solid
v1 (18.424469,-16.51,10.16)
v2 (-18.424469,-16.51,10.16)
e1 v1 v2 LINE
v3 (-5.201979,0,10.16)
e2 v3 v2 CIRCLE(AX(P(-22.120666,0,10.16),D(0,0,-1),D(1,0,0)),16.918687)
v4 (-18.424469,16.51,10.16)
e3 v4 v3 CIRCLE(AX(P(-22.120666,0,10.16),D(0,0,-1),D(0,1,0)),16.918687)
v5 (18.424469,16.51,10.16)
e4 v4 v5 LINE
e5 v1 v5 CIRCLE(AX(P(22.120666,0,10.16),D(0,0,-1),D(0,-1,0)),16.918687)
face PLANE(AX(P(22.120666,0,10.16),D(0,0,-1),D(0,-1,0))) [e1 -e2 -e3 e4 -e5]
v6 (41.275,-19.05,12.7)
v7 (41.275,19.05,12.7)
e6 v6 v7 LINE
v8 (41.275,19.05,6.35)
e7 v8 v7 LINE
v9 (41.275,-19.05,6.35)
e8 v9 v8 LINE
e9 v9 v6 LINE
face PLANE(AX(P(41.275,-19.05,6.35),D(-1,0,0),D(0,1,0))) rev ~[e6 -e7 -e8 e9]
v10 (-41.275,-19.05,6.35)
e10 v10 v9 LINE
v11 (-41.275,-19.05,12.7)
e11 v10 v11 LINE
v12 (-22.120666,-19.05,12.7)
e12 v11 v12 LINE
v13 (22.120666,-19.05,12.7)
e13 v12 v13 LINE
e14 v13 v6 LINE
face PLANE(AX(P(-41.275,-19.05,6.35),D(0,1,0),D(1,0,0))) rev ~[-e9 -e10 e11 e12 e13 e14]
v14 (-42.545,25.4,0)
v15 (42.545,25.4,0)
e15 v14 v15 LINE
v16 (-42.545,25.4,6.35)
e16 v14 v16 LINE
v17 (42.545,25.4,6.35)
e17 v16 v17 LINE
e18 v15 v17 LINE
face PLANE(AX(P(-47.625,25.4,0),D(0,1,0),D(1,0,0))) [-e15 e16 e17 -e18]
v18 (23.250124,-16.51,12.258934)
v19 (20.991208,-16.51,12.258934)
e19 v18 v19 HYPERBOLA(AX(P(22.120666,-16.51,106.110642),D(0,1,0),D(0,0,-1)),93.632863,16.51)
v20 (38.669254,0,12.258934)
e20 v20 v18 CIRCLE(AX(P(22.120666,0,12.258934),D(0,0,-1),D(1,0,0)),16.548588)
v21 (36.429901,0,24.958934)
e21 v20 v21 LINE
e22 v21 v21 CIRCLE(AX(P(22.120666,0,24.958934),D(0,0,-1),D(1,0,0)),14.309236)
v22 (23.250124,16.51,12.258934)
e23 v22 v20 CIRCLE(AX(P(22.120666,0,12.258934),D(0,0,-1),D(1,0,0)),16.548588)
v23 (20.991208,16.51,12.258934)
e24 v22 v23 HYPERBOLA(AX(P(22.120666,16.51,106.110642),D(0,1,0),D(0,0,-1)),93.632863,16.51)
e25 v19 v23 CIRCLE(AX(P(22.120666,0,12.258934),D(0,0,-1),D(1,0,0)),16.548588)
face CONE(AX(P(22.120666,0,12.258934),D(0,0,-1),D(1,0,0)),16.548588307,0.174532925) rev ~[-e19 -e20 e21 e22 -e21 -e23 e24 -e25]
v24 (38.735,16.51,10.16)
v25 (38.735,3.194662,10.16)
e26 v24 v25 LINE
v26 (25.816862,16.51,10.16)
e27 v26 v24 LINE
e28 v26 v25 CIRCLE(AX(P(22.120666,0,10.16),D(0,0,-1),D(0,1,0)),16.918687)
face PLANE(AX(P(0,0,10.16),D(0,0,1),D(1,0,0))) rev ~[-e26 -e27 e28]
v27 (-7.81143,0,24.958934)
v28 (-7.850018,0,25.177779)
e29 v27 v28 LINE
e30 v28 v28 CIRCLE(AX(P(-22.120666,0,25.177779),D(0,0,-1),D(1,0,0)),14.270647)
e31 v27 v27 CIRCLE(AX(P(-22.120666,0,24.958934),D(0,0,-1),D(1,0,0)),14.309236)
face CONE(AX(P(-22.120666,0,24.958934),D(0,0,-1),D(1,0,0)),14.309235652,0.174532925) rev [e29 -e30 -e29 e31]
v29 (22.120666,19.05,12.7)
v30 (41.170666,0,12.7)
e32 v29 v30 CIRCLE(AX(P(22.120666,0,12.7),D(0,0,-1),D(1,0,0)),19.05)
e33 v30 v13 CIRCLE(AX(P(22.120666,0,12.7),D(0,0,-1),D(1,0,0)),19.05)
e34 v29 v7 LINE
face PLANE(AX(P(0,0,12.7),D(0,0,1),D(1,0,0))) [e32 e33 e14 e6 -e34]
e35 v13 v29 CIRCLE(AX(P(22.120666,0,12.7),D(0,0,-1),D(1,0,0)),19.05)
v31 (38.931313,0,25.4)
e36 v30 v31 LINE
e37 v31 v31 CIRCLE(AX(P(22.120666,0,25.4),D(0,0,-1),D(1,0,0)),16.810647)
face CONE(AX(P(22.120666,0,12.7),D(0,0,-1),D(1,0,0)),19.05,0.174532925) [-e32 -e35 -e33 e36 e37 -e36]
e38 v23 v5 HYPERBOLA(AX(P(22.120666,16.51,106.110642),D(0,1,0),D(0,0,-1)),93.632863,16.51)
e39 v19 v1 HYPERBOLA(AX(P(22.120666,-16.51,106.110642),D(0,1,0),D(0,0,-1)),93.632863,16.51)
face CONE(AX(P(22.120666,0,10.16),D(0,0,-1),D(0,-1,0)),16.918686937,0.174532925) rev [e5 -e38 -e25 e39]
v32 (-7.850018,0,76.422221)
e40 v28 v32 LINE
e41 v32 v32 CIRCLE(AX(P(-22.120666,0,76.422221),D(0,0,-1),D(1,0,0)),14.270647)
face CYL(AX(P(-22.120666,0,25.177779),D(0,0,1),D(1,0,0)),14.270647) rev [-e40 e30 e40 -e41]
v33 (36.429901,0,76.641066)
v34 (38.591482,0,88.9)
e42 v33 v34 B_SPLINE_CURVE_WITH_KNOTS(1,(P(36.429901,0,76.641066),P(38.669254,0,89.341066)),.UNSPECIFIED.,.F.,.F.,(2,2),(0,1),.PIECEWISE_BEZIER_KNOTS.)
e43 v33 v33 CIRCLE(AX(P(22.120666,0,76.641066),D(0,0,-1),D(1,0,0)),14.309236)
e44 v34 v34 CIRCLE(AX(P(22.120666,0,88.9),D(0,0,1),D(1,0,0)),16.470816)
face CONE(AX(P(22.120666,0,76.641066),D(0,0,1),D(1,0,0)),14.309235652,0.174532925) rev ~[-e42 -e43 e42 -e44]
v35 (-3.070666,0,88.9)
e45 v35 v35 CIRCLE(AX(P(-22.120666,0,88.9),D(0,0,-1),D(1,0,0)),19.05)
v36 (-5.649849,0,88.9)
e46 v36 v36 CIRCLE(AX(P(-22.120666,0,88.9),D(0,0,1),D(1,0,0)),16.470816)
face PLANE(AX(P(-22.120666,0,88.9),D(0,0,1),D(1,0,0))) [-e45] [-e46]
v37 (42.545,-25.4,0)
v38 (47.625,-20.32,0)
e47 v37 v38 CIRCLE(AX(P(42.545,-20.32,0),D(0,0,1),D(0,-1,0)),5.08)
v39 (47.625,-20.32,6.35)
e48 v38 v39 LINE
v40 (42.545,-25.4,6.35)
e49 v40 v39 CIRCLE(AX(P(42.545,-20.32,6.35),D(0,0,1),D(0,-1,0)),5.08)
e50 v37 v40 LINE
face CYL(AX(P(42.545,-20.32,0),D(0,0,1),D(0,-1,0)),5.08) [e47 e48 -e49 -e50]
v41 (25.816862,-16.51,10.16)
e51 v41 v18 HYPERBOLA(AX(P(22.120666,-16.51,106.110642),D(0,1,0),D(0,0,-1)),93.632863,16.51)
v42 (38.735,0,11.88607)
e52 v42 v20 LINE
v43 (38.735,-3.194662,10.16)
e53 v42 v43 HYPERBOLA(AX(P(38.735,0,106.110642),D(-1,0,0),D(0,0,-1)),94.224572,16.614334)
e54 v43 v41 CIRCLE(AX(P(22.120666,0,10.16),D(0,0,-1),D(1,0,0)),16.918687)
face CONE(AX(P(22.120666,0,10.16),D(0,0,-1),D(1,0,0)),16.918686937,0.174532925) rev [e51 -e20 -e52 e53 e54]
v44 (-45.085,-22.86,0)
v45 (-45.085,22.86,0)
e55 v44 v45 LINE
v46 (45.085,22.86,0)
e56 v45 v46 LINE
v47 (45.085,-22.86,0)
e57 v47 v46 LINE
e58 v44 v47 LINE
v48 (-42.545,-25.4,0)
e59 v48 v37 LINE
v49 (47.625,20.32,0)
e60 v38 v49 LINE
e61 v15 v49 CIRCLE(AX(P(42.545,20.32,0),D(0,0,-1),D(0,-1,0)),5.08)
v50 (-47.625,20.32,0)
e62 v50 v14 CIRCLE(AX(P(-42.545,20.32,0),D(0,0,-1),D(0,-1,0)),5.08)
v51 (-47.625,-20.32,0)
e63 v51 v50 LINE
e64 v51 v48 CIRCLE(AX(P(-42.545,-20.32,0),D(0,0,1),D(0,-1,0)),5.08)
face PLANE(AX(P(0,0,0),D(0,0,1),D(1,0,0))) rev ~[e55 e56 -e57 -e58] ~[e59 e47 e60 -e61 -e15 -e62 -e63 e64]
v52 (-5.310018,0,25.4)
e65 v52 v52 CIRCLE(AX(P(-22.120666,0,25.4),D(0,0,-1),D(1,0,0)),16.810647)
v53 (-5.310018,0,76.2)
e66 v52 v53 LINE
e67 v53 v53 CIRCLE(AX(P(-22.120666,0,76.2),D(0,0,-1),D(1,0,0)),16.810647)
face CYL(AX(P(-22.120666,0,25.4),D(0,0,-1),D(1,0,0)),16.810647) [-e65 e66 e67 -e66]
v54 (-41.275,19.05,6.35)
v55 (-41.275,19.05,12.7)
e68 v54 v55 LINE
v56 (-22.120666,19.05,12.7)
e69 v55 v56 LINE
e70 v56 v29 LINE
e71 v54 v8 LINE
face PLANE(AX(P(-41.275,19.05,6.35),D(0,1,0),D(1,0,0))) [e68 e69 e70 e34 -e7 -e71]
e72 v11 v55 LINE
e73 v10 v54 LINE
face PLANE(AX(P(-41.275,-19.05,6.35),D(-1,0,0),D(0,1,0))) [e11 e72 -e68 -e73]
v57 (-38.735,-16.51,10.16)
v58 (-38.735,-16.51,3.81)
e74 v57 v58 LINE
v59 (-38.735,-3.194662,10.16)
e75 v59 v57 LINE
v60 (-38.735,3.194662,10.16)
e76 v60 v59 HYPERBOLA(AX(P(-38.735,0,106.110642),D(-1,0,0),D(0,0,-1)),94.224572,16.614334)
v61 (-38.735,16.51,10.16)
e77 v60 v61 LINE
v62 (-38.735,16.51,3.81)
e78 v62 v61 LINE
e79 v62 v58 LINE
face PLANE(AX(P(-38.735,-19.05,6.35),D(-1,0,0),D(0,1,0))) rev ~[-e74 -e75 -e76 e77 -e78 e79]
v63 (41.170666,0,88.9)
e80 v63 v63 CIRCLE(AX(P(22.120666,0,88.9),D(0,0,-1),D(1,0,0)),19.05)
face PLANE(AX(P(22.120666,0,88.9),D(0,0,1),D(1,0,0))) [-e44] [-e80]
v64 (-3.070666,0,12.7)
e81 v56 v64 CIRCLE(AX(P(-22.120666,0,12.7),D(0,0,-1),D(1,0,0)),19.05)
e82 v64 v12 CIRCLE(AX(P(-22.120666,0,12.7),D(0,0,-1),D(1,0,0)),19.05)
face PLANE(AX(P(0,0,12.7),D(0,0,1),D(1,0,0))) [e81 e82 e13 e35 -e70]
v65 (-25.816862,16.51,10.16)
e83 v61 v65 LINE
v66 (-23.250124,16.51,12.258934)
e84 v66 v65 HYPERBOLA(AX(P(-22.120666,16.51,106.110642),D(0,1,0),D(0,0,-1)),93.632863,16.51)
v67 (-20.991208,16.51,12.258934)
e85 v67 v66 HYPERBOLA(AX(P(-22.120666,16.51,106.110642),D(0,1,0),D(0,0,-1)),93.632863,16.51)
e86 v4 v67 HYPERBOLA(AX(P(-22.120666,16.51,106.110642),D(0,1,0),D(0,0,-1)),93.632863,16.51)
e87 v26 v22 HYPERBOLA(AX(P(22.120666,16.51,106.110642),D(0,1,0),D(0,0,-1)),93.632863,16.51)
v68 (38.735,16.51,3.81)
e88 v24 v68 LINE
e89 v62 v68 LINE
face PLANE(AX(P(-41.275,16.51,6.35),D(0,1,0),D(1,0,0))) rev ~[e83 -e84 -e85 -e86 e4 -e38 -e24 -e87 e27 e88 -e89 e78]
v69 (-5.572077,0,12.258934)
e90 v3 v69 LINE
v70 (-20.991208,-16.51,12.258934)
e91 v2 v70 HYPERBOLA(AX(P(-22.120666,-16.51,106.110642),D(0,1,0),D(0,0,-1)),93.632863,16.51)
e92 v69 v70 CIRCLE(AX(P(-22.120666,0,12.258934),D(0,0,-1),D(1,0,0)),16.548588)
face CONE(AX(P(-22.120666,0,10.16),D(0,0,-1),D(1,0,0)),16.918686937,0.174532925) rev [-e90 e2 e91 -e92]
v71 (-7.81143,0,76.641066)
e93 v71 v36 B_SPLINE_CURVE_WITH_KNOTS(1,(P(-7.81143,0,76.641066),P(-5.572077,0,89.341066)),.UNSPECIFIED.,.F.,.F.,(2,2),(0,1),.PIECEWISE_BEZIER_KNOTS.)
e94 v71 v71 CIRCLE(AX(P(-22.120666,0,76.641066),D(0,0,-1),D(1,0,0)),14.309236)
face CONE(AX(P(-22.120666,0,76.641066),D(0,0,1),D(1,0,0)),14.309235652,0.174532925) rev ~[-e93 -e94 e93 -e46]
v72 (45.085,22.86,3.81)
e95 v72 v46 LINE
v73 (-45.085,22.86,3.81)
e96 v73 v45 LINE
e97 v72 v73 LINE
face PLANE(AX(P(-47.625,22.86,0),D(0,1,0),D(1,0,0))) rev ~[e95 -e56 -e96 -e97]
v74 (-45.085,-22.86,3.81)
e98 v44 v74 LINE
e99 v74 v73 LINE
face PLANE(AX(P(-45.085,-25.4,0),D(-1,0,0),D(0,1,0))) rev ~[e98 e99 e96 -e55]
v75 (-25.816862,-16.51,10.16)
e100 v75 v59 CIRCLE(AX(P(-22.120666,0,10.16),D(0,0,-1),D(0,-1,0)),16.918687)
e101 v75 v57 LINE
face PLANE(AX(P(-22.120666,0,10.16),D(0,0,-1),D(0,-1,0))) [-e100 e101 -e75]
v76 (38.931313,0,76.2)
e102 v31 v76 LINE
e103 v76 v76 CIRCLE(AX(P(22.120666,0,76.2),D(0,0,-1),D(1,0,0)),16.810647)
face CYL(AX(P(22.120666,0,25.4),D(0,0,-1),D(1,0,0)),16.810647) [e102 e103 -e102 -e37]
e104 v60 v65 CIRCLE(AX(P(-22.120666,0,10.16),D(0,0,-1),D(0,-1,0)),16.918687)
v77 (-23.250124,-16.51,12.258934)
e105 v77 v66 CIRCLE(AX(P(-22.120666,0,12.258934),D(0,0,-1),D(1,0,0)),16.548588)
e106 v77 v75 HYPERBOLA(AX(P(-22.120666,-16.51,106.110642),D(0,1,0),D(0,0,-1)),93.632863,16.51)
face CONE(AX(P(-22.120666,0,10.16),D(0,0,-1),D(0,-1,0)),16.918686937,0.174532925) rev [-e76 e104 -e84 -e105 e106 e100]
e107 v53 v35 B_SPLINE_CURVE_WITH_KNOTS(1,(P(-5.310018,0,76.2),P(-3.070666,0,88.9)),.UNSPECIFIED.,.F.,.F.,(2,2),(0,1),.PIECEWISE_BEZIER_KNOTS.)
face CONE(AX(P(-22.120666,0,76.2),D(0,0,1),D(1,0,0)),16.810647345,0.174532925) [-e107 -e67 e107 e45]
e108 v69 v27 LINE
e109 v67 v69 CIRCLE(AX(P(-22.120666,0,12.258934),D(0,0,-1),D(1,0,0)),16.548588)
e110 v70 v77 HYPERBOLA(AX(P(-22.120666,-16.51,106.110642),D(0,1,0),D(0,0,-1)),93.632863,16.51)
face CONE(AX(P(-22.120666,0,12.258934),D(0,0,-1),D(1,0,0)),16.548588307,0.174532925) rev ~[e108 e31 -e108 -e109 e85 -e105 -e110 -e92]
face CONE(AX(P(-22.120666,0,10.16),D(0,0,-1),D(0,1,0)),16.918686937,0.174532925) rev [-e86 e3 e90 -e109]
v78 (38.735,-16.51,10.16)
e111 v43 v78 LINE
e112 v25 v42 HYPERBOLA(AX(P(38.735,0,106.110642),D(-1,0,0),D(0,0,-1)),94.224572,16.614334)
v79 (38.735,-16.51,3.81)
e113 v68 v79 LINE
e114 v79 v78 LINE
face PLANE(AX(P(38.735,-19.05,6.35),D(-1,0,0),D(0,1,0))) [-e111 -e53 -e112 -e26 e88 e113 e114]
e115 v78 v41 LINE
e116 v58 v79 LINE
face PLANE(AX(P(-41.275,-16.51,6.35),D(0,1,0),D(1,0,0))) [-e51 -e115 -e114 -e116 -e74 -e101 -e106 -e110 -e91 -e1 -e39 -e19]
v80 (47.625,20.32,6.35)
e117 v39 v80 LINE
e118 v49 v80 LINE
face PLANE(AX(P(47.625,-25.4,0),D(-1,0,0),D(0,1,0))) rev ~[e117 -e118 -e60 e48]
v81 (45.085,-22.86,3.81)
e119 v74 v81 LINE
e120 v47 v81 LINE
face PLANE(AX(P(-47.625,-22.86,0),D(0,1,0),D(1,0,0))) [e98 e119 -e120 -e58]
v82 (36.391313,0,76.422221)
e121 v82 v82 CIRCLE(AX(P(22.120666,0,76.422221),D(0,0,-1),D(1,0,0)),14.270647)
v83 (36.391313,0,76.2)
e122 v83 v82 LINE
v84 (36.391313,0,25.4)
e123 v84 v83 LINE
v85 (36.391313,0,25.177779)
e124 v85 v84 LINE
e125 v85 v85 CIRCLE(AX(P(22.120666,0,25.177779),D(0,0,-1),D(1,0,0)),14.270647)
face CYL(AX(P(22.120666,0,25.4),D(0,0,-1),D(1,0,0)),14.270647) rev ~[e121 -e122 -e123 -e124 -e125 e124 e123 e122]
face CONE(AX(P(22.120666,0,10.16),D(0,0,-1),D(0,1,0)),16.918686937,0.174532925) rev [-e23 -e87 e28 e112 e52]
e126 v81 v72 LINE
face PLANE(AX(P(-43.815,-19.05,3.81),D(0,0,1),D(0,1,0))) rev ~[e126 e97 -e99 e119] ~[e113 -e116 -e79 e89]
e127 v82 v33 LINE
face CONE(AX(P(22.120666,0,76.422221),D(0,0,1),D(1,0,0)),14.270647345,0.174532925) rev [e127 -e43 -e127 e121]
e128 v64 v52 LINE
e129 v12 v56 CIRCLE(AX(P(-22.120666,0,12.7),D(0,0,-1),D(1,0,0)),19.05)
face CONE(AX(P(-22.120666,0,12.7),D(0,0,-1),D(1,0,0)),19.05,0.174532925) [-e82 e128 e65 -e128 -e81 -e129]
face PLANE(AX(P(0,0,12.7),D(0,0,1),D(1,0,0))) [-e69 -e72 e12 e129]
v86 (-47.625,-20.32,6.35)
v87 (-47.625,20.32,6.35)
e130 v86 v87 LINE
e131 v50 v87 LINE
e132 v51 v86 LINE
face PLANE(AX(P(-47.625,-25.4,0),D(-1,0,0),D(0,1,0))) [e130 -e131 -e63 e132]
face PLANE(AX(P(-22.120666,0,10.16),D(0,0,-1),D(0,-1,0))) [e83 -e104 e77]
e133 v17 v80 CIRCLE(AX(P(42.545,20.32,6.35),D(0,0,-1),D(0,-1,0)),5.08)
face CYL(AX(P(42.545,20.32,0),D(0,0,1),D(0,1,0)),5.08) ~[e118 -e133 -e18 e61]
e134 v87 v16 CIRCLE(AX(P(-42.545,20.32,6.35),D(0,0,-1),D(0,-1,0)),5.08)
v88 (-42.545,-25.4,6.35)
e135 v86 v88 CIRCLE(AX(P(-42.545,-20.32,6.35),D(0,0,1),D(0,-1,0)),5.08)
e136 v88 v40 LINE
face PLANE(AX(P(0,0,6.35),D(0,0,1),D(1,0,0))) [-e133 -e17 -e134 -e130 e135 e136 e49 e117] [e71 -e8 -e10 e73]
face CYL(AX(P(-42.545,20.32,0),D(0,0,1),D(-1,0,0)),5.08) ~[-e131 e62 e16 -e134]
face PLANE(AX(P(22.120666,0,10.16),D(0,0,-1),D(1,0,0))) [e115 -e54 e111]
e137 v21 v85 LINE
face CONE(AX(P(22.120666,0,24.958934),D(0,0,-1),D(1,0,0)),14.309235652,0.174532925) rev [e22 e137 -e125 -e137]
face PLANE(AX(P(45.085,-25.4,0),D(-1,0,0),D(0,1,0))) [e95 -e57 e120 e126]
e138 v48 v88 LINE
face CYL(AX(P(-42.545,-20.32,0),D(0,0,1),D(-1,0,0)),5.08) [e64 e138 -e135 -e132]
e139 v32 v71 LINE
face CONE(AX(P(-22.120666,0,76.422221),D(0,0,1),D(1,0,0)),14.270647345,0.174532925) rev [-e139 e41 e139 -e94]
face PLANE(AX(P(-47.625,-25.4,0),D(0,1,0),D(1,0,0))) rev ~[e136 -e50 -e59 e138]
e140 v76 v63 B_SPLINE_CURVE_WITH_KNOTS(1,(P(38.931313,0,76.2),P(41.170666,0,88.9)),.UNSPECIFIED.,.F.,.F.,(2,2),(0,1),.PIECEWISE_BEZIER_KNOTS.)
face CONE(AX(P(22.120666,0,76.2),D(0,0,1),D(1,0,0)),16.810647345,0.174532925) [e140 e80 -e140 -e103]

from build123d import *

# Parameters (mm, degrees)
F0_W         = 95.25
F0_H         = 50.8
F1_DEPTH     = 6.35
F2_W         = 82.55
F2_H         = 38.1
F3_DEPTH     = 6.35
F4_R         = 19.05
F5_DEPTH     = 12.7
F5_TAPER     = 10
F6_DEPTH     = 50.8
F6_FACE_R    = 16.810647345
F7_DEPTH     = 12.7
F7_TAPER     = -10
F8_T         = 2.54
F8_T3_DEPTH  = 87.63
F8_T5_DEPTH  = 43.18
F8_T8_ANGLE  = 180.0000001354
F8_T10_ANGLE = 90.000000001
F8_T12_ANGLE = 89.9999998666
F8_T14_ANGLE = 180.000000001
F8_T16_ANGLE = 90.000000001
F8_T18_ANGLE = 90.000000001
F9_R         = 5.08


# Not quite as in the source:
# - a shell that OpenCascade refuses in one call is made with other operations: the cavity is built on its own and cut out


with BuildPart() as f1:
    # F0 (on Top) → F1 (new body)
    with BuildSketch(Plane.XY):
        Rectangle(F0_W, F0_H)
    extrude(amount=F1_DEPTH)

    # F2 (on face) → F3 (join)
    with BuildSketch(Plane.XY.offset(6.35)):
        Rectangle(F2_W, F2_H)
    extrude(amount=F3_DEPTH)

    # F4 (on face) → F5 (join)
    with BuildSketch(Plane.XY.offset(12.7)):
        with Locations((-22.1206657588, 0)):
            Circle(F4_R)
        with Locations((22.1206657588, 0)):
            Circle(F4_R)
    extrude(amount=F5_DEPTH, taper=F5_TAPER)

    # F6 (add): faces of the model
    f6_faces = [f1.faces().sort_by_distance(p)[0] for p in [
        (-22.1206657588, 0, 25.4),
        (22.1206657588, 0, 25.4),
    ]]
    extrude(f6_faces, amount=F6_DEPTH)

    # F6_face (on face) → F7 (join)
    with BuildSketch(Plane(origin=(22.1206657588, 0, 76.2), x_dir=(1, 0, 0), z_dir=(0, 0, 1))):
        Circle(F6_FACE_R)
        with Locations((-44.2413315177, 0)):
            Circle(F6_FACE_R)
    extrude(amount=F7_DEPTH, taper=F7_TAPER)

    # F8: shell of thickness 2.54, made by hand


with BuildPart() as f8_core1:
    # F8_t2: copy of F1
    add(f1.part)

    # the walls: a layer under each face that stays
    f8_faces = [f8_core1.faces().sort_by_distance(p)[0] for p in [
        (0, -25.4, 3.175),
        (-47.625, 0, 3.175),
        (47.625, 0, 3.175),
        (-40.8214285714, -21.7714285714, 6.35),
        (0, 25.4, 3.175),
        (0, -19.05, 9.525),
        (41.275, 0, 9.525),
        (0, 19.05, 9.525),
        (-41.275, 0, 9.525),
        (-38.0826109524, -12.7, 12.7),
        (0, 0, 12.7),
        (38.0826109598, -12.7, 12.7),
        (-40.0509894313, 0, 19.05),
        (4.1903420863, 0, 19.05),
        (-38.9313131039, 0, 50.8),
        (5.3100184138, 0, 50.8),
        (-40.0509894313, 0, 82.55),
        (4.1903420863, 0, 82.55),
    ]]
    thicken(f8_faces, amount=-F8_T, mode=Mode.SUBTRACT)

    # F8_s4 → F8_t3 (cut)
    with BuildSketch(Plane.YZ.offset(-43.815)):
        Polygon((-19.0754, 6.3754), (-19.05, 3.81), (-16.51, 3.81), (-16.51, 6.35), align=None)
        Polygon((19.0754, 6.3754), (19.05, 3.81), (16.51, 3.81), (16.51, 6.35), align=None)
    extrude(amount=F8_T3_DEPTH, mode=Mode.SUBTRACT)

    # F8_s6 → F8_t5 (cut)
    with BuildSketch(Plane.XZ.offset(-21.59)):
        Polygon((41.3004, 6.3754), (41.275, 3.81), (38.735, 3.81), (38.735, 6.35), align=None)
        Polygon((-41.3004, 6.3754), (-41.275, 3.81), (-38.735, 3.81), (-38.735, 6.35), align=None)
    extrude(amount=F8_T5_DEPTH, mode=Mode.SUBTRACT)

    # F8_s7 → F8_t8 (revolve, cut)
    with BuildSketch(Plane.YZ.offset(-22.1206657588)):
        Polygon((-19.0750141169, 12.7298106637), (-19.05, 10.16), (-16.9186869368, 10.16), (-16.5485883073, 12.2589336287), align=None)
    revolve(axis=Axis((-22.1206657588, 0, 12.7), (0, 0, -1)), revolution_arc=F8_T8_ANGLE, mode=Mode.SUBTRACT)

    # F8_s9 → F8_t10 (revolve, cut)
    with BuildSketch(Plane.XZ):
        Polygon((-3.0456516419, 12.7298106637), (-3.0706657588, 10.16), (-5.201978822, 10.16), (-5.5720774515, 12.2589336287), align=None)
    revolve(axis=Axis((-22.1206657588, 0, 12.7), (0, 0, -1)), revolution_arc=F8_T10_ANGLE, mode=Mode.SUBTRACT)

    # F8_s11 → F8_t12 (revolve, cut)
    with BuildSketch(Plane.YZ.offset(-22.1206657588)):
        Polygon((19.0750141169, 12.7298106637), (19.05, 10.16), (16.9186869368, 10.16), (16.5485883073, 12.2589336287), align=None)
    revolve(axis=Axis((-22.1206657588, 0, 12.7), (0, 0, -1)), revolution_arc=F8_T12_ANGLE, mode=Mode.SUBTRACT)

    # F8_s13 → F8_t14 (revolve, cut)
    with BuildSketch(Plane.YZ.offset(22.1206657588)):
        Polygon((-19.0750141169, 12.7298106637), (-19.05, 10.16), (-16.9186869368, 10.16), (-16.5485883073, 12.2589336287), align=None)
    revolve(axis=Axis((22.1206657588, 0, 12.7), (0, 0, -1)), revolution_arc=F8_T14_ANGLE, mode=Mode.SUBTRACT)

    # F8_s15 → F8_t16 (revolve, cut)
    with BuildSketch(Plane.XZ):
        Polygon((41.1956798758, 12.7298106637), (41.1706657588, 10.16), (39.0393526957, 10.16), (38.6692540662, 12.2589336287), align=None)
    revolve(axis=Axis((22.1206657588, 0, 12.7), (0, 0, -1)), revolution_arc=F8_T16_ANGLE, mode=Mode.SUBTRACT)

    # F8_s17 → F8_t18 (revolve, cut)
    with BuildSketch(Plane.YZ.offset(22.1206657588)):
        Polygon((19.0750141169, 12.7298106637), (19.05, 10.16), (16.9186869368, 10.16), (16.5485883073, 12.2589336287), align=None)
    revolve(axis=Axis((22.1206657588, 0, 12.7), (0, 0, -1)), revolution_arc=F8_T18_ANGLE, mode=Mode.SUBTRACT)

    # F8_s19 → F8_t20 (revolve, cut)
    with BuildSketch(Plane.XZ):
        Polygon((-5.2596042969, 25.4044106637), (-7.8114301065, 24.9589336287), (-7.8500184138, 25.1777787946), (-7.8500184138, 25.4), align=None)
    revolve(axis=Axis((-22.1206657588, 0, 25.4), (0, 0, -1)), mode=Mode.SUBTRACT)

    # F8_s21 → F8_t22 (revolve, cut)
    with BuildSketch(Plane.XZ):
        Polygon((38.9817272208, 25.4044106637), (36.4299014112, 24.9589336287), (36.3913131039, 25.1777787946), (36.3913131039, 25.4), align=None)
    revolve(axis=Axis((22.1206657588, 0, 25.4), (0, 0, -1)), mode=Mode.SUBTRACT)

    # F8_s23 → F8_t24 (revolve, cut)
    with BuildSketch(Plane.XZ):
        Polygon((-5.2596042969, 76.1955893363), (-7.8500184138, 76.2), (-7.8500184138, 76.4222212054), (-7.8114301065, 76.6410663713), align=None)
    revolve(axis=Axis((-22.1206657588, 0, 76.2), (0, 0, -1)), mode=Mode.SUBTRACT)

    # F8_s25 → F8_t26 (revolve, cut)
    with BuildSketch(Plane.XZ):
        Polygon((38.9817272208, 76.1955893363), (36.3913131039, 76.2), (36.3913131039, 76.4222212054), (36.4299014112, 76.6410663713), align=None)
    revolve(axis=Axis((22.1206657588, 0, 76.2), (0, 0, -1)), mode=Mode.SUBTRACT)


with BuildPart() as f1_1:
    add(f1.part)

    # what is left inside the walls is the cavity
    f8_cavity = [f8_core1.part.solids().sort_by_distance(p)[0] for p in [
        (-36.365913, 0, 59.266667),
    ]]
    add(f8_cavity, mode=Mode.SUBTRACT)

    # F9
    f9_edges = [f1_1.edges().sort_by_distance(p)[0] for p in [
        (-47.625, -25.4, 3.175),
        (47.625, -25.4, 3.175),
        (47.625, 25.4, 3.175),
        (-47.625, 25.4, 3.175),
    ]]
    fillet(f9_edges, radius=F9_R)


solid = f1_1.part
